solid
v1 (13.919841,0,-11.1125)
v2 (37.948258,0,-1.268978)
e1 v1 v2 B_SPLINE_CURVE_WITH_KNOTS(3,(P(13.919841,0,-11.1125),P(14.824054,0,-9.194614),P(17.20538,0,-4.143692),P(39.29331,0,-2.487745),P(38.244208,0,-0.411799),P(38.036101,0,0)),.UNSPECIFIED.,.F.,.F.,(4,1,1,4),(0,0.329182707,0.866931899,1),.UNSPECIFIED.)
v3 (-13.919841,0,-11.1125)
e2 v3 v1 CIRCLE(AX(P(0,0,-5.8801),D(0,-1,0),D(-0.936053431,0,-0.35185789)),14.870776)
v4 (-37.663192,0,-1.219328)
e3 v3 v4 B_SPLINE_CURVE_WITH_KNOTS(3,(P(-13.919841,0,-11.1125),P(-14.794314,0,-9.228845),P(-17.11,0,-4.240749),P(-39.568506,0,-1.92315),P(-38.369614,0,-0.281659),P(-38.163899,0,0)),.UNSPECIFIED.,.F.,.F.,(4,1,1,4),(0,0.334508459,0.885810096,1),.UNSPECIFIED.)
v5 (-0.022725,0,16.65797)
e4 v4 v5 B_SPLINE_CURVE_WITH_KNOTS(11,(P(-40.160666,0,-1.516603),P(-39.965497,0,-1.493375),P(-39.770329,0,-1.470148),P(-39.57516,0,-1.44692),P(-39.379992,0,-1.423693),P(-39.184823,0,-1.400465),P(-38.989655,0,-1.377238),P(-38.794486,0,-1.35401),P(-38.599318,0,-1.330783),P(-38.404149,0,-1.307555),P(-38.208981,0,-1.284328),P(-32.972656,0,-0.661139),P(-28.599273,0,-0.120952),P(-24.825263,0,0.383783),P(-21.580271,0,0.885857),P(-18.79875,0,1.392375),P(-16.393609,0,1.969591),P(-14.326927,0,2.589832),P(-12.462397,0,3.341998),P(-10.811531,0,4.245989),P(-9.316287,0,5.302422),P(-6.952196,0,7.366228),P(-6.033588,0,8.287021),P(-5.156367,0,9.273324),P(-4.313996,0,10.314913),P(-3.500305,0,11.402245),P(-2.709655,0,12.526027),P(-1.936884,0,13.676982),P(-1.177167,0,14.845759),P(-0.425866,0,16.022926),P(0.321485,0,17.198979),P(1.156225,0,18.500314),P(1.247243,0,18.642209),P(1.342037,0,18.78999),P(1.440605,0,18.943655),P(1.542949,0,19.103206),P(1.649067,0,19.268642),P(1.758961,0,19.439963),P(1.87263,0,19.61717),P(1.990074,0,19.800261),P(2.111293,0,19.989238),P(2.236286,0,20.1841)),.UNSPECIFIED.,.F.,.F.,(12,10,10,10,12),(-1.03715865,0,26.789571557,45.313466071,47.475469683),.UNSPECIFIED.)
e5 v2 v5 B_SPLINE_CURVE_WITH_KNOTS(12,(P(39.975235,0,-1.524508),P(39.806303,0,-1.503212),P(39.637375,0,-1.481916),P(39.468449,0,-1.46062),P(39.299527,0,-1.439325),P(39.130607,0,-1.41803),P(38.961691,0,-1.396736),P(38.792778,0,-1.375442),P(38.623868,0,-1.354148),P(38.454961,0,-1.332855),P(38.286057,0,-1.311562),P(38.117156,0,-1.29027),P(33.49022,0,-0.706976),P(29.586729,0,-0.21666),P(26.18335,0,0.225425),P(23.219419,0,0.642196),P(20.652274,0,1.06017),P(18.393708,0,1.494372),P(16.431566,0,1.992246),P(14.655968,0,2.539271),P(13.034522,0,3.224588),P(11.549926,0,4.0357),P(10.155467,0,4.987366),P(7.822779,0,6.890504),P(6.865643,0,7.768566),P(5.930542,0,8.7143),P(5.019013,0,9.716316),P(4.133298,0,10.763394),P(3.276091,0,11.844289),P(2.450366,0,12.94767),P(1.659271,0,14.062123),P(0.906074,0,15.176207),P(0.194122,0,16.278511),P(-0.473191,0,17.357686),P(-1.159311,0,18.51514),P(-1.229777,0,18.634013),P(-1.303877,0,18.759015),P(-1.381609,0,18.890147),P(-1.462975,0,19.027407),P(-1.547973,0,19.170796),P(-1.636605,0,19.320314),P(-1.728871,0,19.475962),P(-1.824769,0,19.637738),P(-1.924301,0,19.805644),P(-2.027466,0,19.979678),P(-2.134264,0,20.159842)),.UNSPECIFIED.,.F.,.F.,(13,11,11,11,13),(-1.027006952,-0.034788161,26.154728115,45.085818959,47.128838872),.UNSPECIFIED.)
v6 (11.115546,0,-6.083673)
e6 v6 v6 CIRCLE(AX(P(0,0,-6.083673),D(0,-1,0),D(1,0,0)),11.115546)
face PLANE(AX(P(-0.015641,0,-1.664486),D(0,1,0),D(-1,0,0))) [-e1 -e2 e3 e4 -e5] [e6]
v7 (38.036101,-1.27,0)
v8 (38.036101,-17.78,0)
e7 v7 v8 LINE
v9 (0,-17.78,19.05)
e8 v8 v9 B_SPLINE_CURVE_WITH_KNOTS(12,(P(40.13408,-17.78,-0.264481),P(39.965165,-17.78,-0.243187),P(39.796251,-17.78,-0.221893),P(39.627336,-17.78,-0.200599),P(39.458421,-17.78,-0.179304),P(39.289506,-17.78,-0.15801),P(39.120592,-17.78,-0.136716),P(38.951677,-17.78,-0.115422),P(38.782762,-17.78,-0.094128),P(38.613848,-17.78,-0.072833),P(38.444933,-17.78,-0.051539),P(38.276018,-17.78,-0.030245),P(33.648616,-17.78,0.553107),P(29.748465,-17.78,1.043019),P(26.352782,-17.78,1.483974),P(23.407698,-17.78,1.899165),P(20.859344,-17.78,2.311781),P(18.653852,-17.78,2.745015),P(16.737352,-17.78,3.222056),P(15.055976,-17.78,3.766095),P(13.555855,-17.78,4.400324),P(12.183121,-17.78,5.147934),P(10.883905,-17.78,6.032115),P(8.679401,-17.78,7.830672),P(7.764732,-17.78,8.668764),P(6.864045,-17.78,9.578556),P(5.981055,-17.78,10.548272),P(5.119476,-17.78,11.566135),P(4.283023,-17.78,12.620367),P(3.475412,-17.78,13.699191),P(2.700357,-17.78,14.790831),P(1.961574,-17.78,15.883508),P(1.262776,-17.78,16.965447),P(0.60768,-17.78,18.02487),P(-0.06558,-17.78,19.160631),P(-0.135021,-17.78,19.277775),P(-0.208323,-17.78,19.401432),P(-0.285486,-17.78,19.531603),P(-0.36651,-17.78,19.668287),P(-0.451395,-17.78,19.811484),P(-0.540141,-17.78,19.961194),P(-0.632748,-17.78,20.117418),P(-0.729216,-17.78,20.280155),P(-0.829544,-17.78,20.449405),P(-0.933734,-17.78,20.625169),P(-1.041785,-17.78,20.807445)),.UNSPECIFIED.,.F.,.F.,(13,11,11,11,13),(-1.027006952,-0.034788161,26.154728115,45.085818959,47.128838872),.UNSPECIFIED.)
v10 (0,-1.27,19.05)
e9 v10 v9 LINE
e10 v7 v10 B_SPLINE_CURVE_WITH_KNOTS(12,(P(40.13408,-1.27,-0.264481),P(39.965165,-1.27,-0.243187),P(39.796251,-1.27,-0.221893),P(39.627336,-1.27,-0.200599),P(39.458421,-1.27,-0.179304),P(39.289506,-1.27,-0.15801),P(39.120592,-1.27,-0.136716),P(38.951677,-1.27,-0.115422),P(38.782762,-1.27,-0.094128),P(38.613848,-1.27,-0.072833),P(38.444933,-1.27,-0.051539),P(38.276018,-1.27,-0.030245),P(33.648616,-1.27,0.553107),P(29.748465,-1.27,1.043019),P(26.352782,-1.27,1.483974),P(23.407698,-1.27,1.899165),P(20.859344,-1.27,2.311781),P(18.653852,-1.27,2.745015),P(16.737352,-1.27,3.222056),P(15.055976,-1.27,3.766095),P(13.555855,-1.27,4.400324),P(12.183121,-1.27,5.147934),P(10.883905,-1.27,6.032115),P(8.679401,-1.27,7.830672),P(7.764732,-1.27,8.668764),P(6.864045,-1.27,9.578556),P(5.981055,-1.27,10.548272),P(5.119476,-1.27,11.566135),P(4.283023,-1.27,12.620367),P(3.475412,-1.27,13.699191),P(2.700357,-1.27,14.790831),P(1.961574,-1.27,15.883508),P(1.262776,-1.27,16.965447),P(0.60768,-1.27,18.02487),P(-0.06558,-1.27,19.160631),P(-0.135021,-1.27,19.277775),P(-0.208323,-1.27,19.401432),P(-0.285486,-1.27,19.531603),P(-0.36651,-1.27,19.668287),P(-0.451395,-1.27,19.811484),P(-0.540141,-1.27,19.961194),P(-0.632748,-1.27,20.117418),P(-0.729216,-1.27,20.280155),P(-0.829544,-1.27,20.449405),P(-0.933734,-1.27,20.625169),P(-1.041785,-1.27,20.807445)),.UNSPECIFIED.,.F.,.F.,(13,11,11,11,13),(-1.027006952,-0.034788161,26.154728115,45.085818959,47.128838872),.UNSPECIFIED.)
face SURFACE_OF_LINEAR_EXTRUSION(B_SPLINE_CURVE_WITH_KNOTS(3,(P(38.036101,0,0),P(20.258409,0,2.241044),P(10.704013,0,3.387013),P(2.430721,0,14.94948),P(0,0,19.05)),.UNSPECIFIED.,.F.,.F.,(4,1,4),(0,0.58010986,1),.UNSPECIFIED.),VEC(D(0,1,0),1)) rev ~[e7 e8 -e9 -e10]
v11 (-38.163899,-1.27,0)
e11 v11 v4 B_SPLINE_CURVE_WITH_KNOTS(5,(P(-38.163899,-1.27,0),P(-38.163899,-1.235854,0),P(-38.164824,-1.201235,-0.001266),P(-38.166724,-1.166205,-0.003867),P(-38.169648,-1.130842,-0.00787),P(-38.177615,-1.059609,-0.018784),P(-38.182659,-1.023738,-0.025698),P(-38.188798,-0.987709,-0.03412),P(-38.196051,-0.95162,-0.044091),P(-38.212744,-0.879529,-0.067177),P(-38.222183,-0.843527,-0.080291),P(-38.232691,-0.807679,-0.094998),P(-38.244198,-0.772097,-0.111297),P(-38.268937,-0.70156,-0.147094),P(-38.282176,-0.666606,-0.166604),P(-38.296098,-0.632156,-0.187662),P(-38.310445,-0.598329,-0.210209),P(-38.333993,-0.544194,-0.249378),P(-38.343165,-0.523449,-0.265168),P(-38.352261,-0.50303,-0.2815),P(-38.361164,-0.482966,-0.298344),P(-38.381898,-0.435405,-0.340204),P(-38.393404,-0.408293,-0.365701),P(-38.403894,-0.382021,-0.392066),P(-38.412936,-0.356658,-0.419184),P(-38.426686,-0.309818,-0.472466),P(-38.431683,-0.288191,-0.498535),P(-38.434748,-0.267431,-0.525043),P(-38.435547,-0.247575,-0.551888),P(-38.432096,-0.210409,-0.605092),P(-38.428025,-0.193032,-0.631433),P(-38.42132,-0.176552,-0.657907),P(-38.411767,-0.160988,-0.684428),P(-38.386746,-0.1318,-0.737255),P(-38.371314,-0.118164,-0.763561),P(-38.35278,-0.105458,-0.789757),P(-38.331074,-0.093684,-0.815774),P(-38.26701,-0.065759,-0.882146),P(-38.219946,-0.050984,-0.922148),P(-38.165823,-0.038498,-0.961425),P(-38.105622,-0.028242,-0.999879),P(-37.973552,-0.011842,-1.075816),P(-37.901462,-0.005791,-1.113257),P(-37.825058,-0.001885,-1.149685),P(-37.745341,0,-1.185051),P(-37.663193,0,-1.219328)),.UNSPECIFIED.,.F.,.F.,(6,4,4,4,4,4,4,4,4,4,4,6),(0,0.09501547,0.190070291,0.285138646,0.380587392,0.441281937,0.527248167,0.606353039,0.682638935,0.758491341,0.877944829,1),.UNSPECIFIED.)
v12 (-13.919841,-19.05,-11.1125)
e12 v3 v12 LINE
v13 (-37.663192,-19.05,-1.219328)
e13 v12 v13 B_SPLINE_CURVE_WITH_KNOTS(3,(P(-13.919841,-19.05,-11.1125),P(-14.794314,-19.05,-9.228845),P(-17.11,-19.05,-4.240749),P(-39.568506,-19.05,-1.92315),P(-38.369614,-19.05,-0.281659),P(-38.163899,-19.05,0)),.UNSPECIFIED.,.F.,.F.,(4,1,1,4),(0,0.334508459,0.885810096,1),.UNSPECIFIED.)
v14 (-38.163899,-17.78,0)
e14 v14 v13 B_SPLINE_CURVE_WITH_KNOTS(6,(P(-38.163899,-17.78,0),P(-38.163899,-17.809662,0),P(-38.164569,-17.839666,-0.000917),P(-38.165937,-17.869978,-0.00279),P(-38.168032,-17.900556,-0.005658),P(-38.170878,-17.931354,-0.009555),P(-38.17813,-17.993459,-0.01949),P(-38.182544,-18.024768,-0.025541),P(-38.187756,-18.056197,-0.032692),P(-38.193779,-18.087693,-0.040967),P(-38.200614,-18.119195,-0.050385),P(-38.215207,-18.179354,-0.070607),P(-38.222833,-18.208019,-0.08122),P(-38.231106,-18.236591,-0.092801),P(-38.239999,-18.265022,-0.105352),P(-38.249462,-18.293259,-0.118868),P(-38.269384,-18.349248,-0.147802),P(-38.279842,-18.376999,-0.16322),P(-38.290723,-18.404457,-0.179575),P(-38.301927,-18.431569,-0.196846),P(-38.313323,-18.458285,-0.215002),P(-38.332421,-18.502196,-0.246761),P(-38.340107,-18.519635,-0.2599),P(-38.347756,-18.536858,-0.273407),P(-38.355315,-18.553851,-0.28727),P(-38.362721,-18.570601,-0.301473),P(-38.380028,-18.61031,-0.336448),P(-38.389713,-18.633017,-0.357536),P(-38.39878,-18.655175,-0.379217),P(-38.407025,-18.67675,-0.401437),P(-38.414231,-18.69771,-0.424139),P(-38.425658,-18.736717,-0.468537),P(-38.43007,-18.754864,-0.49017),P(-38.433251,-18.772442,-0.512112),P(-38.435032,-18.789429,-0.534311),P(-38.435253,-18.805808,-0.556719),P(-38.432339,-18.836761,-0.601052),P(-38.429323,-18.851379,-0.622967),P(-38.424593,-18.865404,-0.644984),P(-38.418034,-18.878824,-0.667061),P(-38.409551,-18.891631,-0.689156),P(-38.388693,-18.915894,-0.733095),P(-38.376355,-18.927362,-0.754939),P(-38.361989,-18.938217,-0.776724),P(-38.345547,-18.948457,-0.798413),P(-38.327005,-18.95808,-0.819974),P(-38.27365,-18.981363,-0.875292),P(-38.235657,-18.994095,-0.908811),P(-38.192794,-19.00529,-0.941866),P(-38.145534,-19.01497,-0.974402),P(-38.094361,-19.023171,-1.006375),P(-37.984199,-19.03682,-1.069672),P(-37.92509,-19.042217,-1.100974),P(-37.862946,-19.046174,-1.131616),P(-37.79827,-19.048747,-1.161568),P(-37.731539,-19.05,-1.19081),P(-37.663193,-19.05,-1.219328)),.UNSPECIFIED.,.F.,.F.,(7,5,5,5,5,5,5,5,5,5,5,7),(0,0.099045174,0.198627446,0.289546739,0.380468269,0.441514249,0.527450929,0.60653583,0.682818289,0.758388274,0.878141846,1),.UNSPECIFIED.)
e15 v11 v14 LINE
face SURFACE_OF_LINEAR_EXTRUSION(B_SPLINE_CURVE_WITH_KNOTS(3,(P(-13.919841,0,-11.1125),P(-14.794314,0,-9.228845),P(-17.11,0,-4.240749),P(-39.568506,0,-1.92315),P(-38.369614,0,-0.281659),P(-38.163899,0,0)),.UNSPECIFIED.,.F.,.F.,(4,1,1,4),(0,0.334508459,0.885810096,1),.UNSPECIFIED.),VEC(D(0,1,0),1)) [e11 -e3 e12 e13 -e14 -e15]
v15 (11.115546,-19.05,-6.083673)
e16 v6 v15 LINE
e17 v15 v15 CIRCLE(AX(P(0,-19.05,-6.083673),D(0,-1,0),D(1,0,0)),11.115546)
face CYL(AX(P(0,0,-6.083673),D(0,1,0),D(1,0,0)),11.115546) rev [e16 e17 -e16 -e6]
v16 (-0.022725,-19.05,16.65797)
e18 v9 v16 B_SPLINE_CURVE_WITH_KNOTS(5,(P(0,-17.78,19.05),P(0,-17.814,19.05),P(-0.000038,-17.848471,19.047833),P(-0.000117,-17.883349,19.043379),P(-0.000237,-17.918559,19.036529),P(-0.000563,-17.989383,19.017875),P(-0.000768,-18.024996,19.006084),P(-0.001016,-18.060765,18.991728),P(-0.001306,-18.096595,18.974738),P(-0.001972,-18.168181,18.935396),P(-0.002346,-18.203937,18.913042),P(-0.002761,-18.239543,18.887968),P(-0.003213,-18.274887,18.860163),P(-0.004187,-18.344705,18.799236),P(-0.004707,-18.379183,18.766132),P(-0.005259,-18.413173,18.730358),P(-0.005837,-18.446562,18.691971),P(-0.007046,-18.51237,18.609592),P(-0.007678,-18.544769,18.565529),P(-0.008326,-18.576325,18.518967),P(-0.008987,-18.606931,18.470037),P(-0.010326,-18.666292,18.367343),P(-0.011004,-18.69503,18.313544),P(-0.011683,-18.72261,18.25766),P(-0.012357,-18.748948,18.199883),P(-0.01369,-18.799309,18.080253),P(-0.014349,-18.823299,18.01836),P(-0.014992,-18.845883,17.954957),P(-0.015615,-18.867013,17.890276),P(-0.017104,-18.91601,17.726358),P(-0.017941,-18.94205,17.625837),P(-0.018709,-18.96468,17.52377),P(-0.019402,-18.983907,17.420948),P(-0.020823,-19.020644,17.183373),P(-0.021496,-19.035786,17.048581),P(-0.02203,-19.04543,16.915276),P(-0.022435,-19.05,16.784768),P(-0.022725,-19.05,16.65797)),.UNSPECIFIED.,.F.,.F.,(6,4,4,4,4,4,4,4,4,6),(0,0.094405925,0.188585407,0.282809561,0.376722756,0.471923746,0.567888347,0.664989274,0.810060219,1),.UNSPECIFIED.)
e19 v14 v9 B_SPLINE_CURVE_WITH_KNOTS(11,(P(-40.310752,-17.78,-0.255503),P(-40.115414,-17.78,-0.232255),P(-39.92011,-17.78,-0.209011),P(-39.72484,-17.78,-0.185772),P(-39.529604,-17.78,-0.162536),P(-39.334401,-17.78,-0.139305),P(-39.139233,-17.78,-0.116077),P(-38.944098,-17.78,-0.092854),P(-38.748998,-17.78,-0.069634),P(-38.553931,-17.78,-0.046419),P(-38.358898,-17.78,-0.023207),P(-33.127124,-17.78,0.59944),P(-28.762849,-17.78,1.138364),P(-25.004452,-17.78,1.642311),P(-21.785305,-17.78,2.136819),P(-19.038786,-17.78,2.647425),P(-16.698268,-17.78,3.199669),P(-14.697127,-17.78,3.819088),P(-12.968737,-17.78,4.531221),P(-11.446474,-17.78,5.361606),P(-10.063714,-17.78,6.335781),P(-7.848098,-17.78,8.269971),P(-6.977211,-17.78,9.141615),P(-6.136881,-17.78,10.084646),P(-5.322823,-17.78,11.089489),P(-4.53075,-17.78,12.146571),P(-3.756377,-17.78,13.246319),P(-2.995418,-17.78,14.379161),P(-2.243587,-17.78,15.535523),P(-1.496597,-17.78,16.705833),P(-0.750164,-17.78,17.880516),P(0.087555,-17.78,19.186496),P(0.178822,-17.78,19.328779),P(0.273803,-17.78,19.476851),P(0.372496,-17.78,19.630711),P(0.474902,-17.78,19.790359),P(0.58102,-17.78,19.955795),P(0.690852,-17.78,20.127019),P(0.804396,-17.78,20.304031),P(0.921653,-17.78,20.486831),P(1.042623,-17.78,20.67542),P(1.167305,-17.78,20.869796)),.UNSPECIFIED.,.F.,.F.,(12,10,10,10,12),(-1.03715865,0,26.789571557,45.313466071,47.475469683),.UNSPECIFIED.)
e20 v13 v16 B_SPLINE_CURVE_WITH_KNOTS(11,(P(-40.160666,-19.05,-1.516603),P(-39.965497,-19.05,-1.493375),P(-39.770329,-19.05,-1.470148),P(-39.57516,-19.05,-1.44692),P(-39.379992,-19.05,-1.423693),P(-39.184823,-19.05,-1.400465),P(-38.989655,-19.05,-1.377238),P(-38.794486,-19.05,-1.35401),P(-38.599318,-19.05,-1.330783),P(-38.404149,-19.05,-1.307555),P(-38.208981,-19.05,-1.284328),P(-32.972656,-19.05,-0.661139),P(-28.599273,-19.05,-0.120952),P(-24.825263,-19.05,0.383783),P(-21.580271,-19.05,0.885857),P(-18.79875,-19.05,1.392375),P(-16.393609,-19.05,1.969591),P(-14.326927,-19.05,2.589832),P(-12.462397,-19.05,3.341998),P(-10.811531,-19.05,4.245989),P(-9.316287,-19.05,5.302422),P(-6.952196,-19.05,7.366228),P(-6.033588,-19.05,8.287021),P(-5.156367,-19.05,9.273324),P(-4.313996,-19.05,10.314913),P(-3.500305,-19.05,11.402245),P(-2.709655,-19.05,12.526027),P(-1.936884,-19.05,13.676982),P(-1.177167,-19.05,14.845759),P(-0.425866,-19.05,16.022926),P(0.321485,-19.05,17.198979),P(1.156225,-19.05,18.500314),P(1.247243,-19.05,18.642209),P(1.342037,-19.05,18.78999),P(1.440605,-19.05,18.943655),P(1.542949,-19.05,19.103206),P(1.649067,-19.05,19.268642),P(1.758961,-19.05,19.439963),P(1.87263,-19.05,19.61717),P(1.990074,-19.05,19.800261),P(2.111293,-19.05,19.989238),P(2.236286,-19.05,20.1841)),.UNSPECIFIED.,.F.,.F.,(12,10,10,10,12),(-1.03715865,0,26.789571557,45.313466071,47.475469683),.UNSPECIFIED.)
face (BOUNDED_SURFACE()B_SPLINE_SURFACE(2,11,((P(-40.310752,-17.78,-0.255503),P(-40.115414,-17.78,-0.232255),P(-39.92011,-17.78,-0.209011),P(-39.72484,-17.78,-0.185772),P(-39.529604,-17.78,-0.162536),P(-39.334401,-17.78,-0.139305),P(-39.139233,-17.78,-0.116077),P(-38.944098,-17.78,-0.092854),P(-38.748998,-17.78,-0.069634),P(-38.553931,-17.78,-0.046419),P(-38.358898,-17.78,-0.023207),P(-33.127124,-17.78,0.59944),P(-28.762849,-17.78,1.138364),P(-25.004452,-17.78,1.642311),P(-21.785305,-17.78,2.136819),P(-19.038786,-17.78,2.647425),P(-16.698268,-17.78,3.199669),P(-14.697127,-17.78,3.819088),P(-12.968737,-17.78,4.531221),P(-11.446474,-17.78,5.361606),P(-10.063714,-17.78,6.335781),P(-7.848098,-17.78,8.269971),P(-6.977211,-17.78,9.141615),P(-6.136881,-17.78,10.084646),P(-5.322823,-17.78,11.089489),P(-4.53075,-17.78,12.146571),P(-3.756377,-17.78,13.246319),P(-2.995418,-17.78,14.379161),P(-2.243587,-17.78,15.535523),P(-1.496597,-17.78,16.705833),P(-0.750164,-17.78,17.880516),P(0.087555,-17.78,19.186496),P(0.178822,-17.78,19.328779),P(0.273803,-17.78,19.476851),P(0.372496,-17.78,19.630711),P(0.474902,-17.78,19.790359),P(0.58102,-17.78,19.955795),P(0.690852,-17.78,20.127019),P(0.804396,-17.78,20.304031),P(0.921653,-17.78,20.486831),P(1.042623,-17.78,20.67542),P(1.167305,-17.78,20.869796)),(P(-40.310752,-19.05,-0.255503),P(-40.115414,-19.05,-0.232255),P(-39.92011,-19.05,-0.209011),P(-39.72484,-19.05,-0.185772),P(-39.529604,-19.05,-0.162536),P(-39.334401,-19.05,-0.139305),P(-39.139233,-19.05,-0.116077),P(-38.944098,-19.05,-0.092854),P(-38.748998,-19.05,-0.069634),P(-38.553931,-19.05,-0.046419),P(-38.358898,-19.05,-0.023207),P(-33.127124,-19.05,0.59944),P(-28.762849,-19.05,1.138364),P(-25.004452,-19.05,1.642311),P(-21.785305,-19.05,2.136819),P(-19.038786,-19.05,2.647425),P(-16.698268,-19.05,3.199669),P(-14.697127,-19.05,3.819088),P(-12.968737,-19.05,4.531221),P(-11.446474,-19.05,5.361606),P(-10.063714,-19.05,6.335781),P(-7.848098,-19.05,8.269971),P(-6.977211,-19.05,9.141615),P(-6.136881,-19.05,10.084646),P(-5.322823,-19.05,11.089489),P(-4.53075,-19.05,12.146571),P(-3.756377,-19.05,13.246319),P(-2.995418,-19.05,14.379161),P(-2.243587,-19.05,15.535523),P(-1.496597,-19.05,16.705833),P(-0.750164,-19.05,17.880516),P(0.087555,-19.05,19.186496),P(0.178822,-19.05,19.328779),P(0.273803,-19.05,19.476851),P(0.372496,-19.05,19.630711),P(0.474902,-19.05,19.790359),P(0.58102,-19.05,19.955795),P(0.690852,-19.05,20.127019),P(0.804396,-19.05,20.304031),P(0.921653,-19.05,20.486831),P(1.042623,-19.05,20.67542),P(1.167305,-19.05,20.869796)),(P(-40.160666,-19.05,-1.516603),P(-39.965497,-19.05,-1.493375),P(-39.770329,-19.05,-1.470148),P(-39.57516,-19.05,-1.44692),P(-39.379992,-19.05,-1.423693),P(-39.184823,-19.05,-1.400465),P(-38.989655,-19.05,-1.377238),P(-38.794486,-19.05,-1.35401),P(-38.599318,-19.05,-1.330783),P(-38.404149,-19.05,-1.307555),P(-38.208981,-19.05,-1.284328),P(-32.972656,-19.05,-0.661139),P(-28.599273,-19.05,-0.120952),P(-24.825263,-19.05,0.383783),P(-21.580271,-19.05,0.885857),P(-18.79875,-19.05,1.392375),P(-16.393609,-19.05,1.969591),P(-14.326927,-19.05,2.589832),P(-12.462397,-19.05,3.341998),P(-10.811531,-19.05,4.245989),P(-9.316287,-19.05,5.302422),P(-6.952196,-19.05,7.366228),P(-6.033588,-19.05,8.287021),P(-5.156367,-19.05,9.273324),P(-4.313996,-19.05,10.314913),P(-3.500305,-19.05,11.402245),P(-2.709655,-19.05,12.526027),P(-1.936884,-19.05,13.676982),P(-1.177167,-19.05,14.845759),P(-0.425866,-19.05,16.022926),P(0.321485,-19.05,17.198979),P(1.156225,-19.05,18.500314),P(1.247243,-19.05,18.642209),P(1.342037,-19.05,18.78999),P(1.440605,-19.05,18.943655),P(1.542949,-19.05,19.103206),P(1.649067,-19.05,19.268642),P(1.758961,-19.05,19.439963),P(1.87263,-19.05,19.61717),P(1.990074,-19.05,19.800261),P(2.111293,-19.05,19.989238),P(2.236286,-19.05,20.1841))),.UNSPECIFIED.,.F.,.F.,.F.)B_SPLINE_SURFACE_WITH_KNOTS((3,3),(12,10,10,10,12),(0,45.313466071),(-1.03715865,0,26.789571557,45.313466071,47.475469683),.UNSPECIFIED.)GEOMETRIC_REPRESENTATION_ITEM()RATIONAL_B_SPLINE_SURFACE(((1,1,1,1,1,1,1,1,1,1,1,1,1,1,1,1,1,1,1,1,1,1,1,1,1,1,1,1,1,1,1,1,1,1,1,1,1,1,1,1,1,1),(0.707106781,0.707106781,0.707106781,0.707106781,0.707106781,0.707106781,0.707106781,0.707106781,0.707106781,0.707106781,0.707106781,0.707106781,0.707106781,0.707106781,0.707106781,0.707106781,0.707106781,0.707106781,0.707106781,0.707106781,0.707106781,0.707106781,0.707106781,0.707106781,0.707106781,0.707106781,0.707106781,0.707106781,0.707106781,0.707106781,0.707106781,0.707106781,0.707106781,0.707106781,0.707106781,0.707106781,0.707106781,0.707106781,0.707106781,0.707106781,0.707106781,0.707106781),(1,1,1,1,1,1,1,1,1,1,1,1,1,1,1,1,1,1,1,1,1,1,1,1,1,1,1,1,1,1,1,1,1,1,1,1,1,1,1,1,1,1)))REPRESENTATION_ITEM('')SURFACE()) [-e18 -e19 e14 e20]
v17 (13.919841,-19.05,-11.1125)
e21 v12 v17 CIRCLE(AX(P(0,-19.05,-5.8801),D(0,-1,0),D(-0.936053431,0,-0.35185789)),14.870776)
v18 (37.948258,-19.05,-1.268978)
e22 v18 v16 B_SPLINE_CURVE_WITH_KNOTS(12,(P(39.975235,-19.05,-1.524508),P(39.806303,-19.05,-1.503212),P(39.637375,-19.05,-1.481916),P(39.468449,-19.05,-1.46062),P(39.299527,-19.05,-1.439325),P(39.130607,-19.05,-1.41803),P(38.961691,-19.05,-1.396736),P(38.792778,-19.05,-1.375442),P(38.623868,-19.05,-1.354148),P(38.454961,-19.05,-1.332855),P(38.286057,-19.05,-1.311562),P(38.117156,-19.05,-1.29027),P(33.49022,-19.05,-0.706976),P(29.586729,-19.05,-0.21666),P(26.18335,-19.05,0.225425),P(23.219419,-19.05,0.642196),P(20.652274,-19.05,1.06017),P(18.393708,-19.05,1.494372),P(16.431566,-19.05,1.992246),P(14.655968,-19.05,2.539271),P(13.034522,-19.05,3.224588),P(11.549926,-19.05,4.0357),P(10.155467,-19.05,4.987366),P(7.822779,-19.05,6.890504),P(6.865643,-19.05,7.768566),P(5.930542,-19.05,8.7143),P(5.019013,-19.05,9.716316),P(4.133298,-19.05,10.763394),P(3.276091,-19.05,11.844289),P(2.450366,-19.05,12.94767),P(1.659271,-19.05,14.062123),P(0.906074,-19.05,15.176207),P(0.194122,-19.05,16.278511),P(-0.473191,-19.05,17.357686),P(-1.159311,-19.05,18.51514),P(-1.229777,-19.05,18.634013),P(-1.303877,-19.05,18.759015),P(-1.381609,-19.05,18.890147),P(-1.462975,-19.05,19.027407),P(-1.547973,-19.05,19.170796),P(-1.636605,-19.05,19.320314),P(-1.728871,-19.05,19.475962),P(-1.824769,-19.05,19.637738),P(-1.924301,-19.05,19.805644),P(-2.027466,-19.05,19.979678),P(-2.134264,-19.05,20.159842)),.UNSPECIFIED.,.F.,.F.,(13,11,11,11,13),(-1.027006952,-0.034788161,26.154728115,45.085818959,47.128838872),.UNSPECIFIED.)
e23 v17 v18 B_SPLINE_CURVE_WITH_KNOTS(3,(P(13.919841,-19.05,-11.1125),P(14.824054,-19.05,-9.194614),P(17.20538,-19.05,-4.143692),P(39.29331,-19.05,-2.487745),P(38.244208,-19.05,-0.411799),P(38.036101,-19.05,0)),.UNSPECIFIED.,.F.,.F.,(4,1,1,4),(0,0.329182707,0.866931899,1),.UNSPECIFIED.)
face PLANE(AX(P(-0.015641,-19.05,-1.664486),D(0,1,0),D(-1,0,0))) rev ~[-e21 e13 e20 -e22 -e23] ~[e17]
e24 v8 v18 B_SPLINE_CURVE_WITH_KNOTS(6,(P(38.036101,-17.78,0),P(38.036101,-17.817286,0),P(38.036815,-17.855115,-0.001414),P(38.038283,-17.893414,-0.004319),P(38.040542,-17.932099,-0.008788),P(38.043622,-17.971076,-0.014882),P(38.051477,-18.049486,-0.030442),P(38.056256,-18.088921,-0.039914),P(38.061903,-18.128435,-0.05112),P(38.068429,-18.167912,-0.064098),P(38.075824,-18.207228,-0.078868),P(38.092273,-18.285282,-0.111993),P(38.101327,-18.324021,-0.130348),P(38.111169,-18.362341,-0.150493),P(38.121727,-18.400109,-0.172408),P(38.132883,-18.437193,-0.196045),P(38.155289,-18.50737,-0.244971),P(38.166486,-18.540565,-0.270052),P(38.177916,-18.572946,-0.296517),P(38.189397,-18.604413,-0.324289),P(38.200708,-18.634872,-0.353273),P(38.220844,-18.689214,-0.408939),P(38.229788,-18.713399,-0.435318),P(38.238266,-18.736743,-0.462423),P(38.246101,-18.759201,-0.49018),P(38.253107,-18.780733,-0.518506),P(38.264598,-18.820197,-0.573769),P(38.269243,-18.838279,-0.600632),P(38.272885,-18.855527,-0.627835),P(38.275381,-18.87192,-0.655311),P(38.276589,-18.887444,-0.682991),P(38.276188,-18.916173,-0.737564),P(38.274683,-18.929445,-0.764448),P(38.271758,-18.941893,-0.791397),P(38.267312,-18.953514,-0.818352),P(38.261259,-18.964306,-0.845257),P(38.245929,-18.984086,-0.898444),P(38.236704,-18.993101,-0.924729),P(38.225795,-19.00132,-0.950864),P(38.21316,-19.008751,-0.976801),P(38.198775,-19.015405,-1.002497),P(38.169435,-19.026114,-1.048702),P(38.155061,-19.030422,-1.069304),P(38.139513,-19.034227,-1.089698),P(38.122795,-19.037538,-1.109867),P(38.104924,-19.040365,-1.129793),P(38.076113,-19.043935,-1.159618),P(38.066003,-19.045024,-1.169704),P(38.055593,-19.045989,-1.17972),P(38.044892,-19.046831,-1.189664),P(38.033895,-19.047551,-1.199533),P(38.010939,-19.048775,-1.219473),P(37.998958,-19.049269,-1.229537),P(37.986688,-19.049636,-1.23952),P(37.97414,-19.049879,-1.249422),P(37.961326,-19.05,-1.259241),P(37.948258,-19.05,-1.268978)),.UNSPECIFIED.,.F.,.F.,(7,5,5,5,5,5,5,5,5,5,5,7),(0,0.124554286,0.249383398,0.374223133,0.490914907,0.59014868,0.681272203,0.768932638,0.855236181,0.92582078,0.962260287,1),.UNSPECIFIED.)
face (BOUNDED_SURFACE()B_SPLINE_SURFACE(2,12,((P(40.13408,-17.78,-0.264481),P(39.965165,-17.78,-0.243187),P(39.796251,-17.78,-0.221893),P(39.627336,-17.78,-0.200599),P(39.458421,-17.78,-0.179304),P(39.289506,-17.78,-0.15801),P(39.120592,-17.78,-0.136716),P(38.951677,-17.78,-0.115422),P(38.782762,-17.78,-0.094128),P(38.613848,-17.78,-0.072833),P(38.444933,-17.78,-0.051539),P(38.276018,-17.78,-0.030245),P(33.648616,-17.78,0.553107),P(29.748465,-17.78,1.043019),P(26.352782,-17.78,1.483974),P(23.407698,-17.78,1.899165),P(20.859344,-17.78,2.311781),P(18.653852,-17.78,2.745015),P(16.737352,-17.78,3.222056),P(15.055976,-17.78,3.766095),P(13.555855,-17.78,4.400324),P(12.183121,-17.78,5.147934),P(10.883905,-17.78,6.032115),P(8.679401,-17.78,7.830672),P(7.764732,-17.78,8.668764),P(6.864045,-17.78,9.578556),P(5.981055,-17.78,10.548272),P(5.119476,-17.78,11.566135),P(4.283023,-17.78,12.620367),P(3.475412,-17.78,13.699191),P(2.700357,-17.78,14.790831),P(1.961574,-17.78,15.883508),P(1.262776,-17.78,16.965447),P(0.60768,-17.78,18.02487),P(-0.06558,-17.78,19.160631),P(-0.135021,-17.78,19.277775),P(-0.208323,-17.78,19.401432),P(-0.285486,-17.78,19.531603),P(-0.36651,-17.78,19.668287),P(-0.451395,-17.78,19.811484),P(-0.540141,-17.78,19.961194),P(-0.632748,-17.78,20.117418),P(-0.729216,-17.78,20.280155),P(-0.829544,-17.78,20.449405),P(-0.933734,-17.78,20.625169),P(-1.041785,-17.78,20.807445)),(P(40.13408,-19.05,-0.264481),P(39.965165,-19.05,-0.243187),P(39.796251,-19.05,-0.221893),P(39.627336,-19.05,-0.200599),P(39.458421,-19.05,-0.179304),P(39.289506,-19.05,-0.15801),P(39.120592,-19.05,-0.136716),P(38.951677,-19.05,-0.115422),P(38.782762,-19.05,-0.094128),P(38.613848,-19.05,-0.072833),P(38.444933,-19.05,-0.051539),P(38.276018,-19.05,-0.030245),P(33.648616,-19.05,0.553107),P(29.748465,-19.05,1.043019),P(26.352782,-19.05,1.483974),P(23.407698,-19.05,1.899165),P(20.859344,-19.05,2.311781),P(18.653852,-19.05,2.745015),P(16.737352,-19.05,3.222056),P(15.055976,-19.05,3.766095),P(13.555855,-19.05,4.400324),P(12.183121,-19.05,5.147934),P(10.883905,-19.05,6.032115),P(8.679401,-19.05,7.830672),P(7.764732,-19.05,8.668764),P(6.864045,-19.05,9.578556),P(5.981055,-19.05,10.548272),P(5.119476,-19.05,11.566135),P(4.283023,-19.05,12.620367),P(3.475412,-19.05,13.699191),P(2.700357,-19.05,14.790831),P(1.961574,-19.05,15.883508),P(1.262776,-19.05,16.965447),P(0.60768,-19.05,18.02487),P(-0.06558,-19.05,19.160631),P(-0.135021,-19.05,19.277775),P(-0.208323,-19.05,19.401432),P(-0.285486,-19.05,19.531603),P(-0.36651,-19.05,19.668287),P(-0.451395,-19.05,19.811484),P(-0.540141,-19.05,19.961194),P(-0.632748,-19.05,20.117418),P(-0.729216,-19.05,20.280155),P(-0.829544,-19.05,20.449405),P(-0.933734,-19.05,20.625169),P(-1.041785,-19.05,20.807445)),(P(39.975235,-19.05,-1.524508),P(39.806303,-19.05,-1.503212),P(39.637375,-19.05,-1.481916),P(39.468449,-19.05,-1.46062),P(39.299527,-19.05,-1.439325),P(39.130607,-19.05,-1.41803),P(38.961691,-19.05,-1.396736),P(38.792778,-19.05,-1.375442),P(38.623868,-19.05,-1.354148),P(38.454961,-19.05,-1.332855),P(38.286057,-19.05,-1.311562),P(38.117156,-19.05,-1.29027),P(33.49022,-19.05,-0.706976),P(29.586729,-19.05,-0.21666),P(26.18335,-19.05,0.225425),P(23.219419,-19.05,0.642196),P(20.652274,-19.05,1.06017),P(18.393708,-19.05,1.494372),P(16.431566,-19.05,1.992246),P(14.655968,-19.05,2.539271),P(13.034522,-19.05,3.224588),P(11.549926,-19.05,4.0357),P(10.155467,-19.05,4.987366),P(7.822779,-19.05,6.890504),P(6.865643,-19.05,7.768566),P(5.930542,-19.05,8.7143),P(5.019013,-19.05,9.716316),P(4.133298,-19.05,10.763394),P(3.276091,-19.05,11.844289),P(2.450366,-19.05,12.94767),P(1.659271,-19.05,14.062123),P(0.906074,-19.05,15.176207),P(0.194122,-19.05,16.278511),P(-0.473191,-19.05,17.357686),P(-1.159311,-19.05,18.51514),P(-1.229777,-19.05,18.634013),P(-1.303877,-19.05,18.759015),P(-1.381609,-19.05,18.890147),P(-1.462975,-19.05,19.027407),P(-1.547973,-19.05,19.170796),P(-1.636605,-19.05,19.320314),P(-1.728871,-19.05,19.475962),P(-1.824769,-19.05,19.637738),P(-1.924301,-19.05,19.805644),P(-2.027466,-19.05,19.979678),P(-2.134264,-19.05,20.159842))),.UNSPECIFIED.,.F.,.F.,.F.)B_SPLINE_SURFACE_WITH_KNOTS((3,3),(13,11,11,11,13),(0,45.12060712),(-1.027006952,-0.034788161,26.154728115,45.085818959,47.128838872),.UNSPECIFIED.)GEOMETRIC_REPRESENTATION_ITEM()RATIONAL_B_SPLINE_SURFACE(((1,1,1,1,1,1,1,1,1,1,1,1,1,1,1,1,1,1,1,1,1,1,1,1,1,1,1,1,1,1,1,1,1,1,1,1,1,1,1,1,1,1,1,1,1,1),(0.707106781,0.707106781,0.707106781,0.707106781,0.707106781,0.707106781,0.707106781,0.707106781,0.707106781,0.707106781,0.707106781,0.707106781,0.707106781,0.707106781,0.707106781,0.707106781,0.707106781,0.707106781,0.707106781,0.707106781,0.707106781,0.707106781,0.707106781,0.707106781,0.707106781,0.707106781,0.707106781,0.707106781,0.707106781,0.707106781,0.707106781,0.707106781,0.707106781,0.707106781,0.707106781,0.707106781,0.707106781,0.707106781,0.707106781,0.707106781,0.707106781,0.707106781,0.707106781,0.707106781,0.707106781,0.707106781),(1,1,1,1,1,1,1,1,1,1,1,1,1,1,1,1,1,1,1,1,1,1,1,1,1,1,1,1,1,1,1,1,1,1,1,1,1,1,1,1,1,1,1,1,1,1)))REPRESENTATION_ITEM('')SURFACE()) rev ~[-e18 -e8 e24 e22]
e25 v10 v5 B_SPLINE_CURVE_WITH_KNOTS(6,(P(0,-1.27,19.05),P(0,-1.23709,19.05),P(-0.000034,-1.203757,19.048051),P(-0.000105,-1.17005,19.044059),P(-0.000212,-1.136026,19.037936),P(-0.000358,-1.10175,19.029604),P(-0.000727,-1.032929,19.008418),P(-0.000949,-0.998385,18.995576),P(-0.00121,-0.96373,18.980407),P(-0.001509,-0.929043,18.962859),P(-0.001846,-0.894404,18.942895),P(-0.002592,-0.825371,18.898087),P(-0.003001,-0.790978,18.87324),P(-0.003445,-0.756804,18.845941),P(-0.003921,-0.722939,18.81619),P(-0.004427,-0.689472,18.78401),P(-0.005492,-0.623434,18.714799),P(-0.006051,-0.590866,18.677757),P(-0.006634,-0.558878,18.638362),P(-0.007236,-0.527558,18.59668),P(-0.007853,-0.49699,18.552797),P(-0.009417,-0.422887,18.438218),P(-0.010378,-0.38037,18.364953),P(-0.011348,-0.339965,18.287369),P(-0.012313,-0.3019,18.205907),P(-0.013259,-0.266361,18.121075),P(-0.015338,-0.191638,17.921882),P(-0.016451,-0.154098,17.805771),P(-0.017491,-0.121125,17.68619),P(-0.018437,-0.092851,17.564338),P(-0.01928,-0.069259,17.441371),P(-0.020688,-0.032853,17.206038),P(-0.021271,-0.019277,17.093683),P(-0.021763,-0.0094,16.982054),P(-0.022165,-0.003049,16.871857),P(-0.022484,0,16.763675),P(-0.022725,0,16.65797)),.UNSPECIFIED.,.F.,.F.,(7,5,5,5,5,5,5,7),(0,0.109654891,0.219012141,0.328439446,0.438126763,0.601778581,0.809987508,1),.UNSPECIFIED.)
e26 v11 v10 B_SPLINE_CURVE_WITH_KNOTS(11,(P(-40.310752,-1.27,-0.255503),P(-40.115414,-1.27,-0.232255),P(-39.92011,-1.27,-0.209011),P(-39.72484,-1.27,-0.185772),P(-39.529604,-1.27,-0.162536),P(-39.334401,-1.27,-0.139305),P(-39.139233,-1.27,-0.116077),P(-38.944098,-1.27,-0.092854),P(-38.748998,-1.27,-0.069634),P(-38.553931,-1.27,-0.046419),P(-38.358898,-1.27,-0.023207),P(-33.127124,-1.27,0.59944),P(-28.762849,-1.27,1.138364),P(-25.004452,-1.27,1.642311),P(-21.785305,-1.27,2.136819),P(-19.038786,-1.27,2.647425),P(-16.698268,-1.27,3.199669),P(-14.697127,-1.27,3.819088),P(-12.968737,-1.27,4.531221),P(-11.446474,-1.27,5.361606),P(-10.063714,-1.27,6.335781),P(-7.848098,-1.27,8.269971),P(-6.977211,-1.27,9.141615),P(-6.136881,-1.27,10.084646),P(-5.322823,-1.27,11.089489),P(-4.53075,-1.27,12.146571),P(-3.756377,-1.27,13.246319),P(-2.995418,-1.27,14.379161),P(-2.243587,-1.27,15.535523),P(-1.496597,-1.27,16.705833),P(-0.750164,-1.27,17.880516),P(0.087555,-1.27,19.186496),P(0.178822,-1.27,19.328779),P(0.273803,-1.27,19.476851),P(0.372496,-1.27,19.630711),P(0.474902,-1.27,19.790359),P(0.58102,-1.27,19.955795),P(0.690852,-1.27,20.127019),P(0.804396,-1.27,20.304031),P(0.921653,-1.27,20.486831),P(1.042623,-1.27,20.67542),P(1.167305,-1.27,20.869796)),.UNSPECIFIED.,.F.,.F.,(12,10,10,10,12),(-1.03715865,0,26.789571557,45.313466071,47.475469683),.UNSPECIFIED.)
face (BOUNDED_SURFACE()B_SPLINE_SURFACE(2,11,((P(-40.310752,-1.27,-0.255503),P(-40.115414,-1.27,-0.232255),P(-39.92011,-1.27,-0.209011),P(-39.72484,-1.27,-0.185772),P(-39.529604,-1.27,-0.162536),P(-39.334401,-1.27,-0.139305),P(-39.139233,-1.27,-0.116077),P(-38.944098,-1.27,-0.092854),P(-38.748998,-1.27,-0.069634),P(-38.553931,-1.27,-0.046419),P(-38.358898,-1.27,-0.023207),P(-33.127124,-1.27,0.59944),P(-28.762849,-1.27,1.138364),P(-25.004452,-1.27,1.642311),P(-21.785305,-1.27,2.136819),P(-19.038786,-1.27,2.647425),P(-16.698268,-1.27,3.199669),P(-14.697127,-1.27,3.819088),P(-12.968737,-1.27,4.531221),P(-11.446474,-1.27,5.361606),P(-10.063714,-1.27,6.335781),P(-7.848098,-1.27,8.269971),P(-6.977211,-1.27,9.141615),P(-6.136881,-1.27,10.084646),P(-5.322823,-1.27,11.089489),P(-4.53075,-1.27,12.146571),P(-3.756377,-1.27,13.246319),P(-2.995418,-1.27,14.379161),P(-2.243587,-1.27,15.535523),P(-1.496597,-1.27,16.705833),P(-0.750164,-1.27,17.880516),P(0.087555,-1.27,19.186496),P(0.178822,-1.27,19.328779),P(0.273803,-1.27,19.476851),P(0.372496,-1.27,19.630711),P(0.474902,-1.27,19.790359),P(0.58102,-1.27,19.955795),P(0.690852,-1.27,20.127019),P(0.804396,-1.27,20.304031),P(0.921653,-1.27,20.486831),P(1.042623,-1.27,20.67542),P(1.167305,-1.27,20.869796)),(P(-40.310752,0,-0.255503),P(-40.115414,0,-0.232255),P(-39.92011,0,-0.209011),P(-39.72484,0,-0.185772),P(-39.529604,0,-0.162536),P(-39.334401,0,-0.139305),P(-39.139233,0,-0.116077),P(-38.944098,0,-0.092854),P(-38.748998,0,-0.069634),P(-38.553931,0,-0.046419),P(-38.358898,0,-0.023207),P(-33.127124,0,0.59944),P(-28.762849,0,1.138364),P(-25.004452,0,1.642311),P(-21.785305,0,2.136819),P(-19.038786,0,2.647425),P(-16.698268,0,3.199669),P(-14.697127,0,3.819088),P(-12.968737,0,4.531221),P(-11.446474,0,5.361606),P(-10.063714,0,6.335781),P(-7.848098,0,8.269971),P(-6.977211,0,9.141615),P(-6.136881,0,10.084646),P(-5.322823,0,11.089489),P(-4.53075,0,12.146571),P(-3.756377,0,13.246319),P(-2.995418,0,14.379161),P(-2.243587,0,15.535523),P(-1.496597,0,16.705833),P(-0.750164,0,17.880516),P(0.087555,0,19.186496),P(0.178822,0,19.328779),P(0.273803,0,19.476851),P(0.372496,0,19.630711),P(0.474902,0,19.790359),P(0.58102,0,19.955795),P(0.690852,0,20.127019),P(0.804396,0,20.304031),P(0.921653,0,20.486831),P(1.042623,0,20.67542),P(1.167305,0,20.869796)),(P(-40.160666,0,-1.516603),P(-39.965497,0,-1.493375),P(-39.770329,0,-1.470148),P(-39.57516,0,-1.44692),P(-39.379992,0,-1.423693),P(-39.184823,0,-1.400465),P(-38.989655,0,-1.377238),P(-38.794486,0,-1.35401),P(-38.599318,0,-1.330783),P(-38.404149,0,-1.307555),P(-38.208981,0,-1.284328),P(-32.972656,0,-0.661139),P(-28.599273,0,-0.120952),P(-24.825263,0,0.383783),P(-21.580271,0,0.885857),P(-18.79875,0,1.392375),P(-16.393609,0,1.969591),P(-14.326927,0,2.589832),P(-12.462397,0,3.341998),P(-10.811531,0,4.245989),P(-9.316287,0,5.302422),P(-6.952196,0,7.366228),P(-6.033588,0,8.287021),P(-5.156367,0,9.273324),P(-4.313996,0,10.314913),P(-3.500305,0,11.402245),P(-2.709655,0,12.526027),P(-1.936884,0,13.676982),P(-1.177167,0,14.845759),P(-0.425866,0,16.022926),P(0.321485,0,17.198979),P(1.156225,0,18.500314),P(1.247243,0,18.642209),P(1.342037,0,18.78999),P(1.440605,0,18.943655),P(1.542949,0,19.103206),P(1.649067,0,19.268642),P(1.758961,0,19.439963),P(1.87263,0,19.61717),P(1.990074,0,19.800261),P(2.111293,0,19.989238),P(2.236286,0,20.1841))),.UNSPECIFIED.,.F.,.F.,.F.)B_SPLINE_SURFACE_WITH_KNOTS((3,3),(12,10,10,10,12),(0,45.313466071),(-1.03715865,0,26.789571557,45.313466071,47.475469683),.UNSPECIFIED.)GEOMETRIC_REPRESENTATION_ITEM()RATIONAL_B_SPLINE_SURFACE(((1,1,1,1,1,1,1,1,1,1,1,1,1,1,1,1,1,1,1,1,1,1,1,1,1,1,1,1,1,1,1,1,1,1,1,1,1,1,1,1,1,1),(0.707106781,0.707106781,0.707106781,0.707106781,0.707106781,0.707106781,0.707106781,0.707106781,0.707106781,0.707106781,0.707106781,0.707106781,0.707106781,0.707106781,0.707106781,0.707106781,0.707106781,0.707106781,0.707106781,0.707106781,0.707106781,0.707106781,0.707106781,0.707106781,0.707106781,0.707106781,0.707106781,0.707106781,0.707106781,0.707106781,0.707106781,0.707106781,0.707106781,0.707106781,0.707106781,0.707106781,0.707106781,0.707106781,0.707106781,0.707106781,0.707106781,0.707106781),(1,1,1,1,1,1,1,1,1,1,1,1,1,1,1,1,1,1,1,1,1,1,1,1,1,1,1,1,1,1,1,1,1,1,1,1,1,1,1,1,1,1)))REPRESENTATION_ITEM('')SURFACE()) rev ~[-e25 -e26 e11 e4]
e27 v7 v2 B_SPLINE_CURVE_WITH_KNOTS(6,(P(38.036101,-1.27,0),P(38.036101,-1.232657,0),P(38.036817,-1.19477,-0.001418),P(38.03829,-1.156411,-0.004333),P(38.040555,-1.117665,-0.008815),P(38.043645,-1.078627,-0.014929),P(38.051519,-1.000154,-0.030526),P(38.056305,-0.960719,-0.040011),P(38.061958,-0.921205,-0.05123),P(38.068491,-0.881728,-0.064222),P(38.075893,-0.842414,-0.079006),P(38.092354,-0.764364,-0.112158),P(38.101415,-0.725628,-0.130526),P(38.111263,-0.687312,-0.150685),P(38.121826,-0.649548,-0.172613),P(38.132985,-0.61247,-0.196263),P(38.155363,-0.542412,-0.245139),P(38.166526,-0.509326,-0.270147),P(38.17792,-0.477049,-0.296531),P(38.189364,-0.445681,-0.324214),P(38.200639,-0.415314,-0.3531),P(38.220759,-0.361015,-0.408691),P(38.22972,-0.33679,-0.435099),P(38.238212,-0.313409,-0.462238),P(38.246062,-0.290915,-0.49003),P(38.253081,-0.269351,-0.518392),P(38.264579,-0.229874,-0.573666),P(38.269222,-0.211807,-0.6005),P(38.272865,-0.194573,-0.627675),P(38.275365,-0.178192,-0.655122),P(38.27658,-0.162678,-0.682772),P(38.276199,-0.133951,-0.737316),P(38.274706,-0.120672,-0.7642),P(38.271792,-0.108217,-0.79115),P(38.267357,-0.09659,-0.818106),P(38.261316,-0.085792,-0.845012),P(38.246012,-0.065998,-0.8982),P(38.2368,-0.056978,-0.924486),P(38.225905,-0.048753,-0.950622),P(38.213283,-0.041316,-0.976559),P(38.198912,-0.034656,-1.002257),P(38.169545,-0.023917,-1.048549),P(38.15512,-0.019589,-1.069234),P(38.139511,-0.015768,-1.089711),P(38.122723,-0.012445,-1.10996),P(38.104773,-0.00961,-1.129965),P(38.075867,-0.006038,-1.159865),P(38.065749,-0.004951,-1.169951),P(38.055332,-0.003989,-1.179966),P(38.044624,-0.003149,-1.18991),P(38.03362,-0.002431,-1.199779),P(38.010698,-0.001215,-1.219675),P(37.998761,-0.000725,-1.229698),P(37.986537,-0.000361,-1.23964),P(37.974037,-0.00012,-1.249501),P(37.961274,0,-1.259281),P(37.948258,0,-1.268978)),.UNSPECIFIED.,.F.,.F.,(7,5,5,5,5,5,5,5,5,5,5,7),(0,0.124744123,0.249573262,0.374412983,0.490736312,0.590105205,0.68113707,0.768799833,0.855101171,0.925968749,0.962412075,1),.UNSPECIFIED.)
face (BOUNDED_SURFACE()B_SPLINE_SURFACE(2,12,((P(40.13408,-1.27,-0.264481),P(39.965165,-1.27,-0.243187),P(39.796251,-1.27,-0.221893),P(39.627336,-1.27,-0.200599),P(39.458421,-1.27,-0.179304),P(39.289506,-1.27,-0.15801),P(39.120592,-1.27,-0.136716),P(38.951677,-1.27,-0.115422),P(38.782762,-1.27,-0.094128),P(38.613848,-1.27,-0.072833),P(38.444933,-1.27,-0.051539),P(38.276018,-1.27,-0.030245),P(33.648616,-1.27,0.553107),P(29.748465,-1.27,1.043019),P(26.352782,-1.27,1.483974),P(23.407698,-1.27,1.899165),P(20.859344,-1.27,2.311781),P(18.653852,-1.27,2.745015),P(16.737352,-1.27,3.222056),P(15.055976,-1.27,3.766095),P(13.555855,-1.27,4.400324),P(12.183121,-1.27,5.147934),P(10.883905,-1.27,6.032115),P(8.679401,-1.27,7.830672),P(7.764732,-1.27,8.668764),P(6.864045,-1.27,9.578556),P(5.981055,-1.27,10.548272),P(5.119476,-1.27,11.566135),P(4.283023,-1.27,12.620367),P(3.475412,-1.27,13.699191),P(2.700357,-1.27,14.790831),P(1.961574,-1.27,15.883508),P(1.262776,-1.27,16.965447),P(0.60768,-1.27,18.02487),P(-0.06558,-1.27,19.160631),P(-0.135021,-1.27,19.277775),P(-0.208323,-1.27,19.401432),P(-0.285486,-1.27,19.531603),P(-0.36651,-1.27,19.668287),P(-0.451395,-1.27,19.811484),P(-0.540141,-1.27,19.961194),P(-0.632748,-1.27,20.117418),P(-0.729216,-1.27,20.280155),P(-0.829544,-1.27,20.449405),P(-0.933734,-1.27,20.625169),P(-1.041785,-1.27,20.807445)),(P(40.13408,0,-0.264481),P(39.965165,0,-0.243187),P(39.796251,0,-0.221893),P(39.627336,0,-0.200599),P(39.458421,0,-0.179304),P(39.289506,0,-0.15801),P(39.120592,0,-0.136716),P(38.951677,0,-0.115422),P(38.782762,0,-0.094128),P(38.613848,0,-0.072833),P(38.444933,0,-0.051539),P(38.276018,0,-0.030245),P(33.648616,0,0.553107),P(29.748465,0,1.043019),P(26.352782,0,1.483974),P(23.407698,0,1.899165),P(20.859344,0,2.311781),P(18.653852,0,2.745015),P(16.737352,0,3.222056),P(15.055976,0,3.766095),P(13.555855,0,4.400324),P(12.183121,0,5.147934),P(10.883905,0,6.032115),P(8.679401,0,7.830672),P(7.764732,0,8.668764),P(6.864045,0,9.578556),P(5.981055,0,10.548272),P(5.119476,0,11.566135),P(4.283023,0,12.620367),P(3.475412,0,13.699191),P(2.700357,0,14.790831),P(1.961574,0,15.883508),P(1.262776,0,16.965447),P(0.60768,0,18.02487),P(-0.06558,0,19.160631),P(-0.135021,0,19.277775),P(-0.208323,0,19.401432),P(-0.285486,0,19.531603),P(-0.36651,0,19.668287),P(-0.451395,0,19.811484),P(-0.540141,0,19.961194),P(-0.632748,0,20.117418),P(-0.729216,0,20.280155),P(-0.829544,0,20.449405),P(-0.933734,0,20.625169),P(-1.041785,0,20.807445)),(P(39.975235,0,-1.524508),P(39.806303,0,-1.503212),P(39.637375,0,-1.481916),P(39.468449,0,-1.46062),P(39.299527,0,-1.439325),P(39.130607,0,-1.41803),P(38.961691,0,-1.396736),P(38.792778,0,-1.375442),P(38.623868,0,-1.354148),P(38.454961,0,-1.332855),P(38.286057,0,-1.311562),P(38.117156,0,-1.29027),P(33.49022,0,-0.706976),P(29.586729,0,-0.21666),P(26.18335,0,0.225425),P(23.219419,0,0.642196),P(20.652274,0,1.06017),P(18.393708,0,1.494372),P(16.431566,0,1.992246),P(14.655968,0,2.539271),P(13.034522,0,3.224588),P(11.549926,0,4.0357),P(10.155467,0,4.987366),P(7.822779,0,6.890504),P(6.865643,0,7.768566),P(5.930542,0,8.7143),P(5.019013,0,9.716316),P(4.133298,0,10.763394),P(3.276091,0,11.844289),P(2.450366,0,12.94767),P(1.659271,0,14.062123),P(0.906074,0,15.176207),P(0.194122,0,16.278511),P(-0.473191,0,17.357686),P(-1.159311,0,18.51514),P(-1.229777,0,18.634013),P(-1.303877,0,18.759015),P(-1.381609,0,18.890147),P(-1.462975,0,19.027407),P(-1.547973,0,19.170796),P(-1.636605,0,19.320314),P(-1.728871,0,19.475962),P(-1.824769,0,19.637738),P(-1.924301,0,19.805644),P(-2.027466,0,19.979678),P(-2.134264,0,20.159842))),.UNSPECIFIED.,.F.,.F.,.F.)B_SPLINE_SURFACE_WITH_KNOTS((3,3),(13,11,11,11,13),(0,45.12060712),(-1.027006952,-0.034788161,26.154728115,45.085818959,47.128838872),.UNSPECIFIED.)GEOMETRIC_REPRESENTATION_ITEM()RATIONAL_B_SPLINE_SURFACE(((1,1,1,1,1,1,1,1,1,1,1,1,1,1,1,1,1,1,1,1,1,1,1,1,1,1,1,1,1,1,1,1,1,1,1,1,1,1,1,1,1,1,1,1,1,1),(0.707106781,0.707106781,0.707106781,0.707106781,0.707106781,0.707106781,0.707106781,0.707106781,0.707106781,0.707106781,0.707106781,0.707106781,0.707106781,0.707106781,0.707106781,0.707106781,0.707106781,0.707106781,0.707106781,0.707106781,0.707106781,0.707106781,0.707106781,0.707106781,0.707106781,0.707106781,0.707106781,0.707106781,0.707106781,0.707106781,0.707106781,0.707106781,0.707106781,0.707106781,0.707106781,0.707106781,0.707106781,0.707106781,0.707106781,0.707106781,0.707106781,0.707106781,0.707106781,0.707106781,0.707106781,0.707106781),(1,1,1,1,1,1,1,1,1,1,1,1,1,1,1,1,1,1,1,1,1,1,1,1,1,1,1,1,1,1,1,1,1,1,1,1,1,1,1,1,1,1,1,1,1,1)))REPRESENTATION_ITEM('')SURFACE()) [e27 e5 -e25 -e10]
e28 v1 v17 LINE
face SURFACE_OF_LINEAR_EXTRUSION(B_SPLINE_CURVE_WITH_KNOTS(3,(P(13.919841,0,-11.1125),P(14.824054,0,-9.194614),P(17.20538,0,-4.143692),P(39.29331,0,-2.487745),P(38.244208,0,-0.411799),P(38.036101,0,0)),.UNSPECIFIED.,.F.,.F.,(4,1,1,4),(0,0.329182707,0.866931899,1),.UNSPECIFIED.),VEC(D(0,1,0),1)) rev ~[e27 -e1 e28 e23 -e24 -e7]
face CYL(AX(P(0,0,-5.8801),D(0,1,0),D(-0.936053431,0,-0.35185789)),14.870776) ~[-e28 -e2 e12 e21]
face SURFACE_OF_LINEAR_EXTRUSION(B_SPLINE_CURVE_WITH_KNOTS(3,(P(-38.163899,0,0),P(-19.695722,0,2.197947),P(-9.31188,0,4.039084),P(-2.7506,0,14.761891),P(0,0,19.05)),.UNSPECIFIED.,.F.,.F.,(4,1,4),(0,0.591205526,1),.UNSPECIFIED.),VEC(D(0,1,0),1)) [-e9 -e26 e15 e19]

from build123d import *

# Parameters (mm, degrees)
F0_R     = 11.1155463884
F1_DEPTH = 19.05
F2_R     = 1.27


with BuildPart() as f1:
    # F0 (on Front) → F1 (new body)
    with BuildSketch(Plane.XZ):
        with BuildLine():
            add(Edge.make_bspline(
                [(-38.1638994336, 0), (-19.6957219024, 2.1979471251), (-9.311880126, 4.0390839853), (-2.7506002225, 14.761891216), (0, 19.05)],
                knots=[0, 0, 0, 0, 0.5912055263, 1, 1, 1, 1], degree=3))
            add(Edge.make_bspline(
                [(-13.9198412699, -11.1125), (-14.794313883, -9.2288451722), (-17.1100002201, -4.2407487086), (-39.5685055328, -1.9231498725), (-38.3696140076, -0.2816590053), (-38.1638994336, 0)],
                knots=[0, 0, 0, 0, 0.3345084593, 0.8858100955, 1, 1, 1, 1], degree=3))
            ThreePointArc((-13.9198412699, -11.1125), (0, -20.7508764), (13.9198412699, -11.1125))
            add(Edge.make_bspline(
                [(13.9198412699, -11.1125), (14.8240544816, -9.1946143672), (17.2053802942, -4.1436921907), (39.2933100068, -2.4877446669), (38.244207933, -0.4117993191), (38.0361005664, 0)],
                knots=[0, 0, 0, 0, 0.3291827069, 0.8669318993, 1, 1, 1, 1], degree=3))
            add(Edge.make_bspline(
                [(38.0361005664, 0), (20.2584086937, 2.241044324), (10.7040125651, 3.3870131368), (2.4307208404, 14.9494804331), (0, 19.05)],
                knots=[0, 0, 0, 0, 0.5801098598, 1, 1, 1, 1], degree=3))
        make_face()
        with Locations((0, -6.0836733319)):
            Circle(F0_R, mode=Mode.SUBTRACT)
    extrude(amount=F1_DEPTH)

    # F2
    f2_edges = [f1.edges().sort_by_distance(p)[0] for p in [
        (15.828231, -19.05, 3.702963),
        (15.828231, 0, 3.702963),
        (-15.834222, -19.05, 3.677027),
        (-15.834222, 0, 3.677027),
    ]]
    fillet(f2_edges, radius=F2_R)


solid = f1.part
